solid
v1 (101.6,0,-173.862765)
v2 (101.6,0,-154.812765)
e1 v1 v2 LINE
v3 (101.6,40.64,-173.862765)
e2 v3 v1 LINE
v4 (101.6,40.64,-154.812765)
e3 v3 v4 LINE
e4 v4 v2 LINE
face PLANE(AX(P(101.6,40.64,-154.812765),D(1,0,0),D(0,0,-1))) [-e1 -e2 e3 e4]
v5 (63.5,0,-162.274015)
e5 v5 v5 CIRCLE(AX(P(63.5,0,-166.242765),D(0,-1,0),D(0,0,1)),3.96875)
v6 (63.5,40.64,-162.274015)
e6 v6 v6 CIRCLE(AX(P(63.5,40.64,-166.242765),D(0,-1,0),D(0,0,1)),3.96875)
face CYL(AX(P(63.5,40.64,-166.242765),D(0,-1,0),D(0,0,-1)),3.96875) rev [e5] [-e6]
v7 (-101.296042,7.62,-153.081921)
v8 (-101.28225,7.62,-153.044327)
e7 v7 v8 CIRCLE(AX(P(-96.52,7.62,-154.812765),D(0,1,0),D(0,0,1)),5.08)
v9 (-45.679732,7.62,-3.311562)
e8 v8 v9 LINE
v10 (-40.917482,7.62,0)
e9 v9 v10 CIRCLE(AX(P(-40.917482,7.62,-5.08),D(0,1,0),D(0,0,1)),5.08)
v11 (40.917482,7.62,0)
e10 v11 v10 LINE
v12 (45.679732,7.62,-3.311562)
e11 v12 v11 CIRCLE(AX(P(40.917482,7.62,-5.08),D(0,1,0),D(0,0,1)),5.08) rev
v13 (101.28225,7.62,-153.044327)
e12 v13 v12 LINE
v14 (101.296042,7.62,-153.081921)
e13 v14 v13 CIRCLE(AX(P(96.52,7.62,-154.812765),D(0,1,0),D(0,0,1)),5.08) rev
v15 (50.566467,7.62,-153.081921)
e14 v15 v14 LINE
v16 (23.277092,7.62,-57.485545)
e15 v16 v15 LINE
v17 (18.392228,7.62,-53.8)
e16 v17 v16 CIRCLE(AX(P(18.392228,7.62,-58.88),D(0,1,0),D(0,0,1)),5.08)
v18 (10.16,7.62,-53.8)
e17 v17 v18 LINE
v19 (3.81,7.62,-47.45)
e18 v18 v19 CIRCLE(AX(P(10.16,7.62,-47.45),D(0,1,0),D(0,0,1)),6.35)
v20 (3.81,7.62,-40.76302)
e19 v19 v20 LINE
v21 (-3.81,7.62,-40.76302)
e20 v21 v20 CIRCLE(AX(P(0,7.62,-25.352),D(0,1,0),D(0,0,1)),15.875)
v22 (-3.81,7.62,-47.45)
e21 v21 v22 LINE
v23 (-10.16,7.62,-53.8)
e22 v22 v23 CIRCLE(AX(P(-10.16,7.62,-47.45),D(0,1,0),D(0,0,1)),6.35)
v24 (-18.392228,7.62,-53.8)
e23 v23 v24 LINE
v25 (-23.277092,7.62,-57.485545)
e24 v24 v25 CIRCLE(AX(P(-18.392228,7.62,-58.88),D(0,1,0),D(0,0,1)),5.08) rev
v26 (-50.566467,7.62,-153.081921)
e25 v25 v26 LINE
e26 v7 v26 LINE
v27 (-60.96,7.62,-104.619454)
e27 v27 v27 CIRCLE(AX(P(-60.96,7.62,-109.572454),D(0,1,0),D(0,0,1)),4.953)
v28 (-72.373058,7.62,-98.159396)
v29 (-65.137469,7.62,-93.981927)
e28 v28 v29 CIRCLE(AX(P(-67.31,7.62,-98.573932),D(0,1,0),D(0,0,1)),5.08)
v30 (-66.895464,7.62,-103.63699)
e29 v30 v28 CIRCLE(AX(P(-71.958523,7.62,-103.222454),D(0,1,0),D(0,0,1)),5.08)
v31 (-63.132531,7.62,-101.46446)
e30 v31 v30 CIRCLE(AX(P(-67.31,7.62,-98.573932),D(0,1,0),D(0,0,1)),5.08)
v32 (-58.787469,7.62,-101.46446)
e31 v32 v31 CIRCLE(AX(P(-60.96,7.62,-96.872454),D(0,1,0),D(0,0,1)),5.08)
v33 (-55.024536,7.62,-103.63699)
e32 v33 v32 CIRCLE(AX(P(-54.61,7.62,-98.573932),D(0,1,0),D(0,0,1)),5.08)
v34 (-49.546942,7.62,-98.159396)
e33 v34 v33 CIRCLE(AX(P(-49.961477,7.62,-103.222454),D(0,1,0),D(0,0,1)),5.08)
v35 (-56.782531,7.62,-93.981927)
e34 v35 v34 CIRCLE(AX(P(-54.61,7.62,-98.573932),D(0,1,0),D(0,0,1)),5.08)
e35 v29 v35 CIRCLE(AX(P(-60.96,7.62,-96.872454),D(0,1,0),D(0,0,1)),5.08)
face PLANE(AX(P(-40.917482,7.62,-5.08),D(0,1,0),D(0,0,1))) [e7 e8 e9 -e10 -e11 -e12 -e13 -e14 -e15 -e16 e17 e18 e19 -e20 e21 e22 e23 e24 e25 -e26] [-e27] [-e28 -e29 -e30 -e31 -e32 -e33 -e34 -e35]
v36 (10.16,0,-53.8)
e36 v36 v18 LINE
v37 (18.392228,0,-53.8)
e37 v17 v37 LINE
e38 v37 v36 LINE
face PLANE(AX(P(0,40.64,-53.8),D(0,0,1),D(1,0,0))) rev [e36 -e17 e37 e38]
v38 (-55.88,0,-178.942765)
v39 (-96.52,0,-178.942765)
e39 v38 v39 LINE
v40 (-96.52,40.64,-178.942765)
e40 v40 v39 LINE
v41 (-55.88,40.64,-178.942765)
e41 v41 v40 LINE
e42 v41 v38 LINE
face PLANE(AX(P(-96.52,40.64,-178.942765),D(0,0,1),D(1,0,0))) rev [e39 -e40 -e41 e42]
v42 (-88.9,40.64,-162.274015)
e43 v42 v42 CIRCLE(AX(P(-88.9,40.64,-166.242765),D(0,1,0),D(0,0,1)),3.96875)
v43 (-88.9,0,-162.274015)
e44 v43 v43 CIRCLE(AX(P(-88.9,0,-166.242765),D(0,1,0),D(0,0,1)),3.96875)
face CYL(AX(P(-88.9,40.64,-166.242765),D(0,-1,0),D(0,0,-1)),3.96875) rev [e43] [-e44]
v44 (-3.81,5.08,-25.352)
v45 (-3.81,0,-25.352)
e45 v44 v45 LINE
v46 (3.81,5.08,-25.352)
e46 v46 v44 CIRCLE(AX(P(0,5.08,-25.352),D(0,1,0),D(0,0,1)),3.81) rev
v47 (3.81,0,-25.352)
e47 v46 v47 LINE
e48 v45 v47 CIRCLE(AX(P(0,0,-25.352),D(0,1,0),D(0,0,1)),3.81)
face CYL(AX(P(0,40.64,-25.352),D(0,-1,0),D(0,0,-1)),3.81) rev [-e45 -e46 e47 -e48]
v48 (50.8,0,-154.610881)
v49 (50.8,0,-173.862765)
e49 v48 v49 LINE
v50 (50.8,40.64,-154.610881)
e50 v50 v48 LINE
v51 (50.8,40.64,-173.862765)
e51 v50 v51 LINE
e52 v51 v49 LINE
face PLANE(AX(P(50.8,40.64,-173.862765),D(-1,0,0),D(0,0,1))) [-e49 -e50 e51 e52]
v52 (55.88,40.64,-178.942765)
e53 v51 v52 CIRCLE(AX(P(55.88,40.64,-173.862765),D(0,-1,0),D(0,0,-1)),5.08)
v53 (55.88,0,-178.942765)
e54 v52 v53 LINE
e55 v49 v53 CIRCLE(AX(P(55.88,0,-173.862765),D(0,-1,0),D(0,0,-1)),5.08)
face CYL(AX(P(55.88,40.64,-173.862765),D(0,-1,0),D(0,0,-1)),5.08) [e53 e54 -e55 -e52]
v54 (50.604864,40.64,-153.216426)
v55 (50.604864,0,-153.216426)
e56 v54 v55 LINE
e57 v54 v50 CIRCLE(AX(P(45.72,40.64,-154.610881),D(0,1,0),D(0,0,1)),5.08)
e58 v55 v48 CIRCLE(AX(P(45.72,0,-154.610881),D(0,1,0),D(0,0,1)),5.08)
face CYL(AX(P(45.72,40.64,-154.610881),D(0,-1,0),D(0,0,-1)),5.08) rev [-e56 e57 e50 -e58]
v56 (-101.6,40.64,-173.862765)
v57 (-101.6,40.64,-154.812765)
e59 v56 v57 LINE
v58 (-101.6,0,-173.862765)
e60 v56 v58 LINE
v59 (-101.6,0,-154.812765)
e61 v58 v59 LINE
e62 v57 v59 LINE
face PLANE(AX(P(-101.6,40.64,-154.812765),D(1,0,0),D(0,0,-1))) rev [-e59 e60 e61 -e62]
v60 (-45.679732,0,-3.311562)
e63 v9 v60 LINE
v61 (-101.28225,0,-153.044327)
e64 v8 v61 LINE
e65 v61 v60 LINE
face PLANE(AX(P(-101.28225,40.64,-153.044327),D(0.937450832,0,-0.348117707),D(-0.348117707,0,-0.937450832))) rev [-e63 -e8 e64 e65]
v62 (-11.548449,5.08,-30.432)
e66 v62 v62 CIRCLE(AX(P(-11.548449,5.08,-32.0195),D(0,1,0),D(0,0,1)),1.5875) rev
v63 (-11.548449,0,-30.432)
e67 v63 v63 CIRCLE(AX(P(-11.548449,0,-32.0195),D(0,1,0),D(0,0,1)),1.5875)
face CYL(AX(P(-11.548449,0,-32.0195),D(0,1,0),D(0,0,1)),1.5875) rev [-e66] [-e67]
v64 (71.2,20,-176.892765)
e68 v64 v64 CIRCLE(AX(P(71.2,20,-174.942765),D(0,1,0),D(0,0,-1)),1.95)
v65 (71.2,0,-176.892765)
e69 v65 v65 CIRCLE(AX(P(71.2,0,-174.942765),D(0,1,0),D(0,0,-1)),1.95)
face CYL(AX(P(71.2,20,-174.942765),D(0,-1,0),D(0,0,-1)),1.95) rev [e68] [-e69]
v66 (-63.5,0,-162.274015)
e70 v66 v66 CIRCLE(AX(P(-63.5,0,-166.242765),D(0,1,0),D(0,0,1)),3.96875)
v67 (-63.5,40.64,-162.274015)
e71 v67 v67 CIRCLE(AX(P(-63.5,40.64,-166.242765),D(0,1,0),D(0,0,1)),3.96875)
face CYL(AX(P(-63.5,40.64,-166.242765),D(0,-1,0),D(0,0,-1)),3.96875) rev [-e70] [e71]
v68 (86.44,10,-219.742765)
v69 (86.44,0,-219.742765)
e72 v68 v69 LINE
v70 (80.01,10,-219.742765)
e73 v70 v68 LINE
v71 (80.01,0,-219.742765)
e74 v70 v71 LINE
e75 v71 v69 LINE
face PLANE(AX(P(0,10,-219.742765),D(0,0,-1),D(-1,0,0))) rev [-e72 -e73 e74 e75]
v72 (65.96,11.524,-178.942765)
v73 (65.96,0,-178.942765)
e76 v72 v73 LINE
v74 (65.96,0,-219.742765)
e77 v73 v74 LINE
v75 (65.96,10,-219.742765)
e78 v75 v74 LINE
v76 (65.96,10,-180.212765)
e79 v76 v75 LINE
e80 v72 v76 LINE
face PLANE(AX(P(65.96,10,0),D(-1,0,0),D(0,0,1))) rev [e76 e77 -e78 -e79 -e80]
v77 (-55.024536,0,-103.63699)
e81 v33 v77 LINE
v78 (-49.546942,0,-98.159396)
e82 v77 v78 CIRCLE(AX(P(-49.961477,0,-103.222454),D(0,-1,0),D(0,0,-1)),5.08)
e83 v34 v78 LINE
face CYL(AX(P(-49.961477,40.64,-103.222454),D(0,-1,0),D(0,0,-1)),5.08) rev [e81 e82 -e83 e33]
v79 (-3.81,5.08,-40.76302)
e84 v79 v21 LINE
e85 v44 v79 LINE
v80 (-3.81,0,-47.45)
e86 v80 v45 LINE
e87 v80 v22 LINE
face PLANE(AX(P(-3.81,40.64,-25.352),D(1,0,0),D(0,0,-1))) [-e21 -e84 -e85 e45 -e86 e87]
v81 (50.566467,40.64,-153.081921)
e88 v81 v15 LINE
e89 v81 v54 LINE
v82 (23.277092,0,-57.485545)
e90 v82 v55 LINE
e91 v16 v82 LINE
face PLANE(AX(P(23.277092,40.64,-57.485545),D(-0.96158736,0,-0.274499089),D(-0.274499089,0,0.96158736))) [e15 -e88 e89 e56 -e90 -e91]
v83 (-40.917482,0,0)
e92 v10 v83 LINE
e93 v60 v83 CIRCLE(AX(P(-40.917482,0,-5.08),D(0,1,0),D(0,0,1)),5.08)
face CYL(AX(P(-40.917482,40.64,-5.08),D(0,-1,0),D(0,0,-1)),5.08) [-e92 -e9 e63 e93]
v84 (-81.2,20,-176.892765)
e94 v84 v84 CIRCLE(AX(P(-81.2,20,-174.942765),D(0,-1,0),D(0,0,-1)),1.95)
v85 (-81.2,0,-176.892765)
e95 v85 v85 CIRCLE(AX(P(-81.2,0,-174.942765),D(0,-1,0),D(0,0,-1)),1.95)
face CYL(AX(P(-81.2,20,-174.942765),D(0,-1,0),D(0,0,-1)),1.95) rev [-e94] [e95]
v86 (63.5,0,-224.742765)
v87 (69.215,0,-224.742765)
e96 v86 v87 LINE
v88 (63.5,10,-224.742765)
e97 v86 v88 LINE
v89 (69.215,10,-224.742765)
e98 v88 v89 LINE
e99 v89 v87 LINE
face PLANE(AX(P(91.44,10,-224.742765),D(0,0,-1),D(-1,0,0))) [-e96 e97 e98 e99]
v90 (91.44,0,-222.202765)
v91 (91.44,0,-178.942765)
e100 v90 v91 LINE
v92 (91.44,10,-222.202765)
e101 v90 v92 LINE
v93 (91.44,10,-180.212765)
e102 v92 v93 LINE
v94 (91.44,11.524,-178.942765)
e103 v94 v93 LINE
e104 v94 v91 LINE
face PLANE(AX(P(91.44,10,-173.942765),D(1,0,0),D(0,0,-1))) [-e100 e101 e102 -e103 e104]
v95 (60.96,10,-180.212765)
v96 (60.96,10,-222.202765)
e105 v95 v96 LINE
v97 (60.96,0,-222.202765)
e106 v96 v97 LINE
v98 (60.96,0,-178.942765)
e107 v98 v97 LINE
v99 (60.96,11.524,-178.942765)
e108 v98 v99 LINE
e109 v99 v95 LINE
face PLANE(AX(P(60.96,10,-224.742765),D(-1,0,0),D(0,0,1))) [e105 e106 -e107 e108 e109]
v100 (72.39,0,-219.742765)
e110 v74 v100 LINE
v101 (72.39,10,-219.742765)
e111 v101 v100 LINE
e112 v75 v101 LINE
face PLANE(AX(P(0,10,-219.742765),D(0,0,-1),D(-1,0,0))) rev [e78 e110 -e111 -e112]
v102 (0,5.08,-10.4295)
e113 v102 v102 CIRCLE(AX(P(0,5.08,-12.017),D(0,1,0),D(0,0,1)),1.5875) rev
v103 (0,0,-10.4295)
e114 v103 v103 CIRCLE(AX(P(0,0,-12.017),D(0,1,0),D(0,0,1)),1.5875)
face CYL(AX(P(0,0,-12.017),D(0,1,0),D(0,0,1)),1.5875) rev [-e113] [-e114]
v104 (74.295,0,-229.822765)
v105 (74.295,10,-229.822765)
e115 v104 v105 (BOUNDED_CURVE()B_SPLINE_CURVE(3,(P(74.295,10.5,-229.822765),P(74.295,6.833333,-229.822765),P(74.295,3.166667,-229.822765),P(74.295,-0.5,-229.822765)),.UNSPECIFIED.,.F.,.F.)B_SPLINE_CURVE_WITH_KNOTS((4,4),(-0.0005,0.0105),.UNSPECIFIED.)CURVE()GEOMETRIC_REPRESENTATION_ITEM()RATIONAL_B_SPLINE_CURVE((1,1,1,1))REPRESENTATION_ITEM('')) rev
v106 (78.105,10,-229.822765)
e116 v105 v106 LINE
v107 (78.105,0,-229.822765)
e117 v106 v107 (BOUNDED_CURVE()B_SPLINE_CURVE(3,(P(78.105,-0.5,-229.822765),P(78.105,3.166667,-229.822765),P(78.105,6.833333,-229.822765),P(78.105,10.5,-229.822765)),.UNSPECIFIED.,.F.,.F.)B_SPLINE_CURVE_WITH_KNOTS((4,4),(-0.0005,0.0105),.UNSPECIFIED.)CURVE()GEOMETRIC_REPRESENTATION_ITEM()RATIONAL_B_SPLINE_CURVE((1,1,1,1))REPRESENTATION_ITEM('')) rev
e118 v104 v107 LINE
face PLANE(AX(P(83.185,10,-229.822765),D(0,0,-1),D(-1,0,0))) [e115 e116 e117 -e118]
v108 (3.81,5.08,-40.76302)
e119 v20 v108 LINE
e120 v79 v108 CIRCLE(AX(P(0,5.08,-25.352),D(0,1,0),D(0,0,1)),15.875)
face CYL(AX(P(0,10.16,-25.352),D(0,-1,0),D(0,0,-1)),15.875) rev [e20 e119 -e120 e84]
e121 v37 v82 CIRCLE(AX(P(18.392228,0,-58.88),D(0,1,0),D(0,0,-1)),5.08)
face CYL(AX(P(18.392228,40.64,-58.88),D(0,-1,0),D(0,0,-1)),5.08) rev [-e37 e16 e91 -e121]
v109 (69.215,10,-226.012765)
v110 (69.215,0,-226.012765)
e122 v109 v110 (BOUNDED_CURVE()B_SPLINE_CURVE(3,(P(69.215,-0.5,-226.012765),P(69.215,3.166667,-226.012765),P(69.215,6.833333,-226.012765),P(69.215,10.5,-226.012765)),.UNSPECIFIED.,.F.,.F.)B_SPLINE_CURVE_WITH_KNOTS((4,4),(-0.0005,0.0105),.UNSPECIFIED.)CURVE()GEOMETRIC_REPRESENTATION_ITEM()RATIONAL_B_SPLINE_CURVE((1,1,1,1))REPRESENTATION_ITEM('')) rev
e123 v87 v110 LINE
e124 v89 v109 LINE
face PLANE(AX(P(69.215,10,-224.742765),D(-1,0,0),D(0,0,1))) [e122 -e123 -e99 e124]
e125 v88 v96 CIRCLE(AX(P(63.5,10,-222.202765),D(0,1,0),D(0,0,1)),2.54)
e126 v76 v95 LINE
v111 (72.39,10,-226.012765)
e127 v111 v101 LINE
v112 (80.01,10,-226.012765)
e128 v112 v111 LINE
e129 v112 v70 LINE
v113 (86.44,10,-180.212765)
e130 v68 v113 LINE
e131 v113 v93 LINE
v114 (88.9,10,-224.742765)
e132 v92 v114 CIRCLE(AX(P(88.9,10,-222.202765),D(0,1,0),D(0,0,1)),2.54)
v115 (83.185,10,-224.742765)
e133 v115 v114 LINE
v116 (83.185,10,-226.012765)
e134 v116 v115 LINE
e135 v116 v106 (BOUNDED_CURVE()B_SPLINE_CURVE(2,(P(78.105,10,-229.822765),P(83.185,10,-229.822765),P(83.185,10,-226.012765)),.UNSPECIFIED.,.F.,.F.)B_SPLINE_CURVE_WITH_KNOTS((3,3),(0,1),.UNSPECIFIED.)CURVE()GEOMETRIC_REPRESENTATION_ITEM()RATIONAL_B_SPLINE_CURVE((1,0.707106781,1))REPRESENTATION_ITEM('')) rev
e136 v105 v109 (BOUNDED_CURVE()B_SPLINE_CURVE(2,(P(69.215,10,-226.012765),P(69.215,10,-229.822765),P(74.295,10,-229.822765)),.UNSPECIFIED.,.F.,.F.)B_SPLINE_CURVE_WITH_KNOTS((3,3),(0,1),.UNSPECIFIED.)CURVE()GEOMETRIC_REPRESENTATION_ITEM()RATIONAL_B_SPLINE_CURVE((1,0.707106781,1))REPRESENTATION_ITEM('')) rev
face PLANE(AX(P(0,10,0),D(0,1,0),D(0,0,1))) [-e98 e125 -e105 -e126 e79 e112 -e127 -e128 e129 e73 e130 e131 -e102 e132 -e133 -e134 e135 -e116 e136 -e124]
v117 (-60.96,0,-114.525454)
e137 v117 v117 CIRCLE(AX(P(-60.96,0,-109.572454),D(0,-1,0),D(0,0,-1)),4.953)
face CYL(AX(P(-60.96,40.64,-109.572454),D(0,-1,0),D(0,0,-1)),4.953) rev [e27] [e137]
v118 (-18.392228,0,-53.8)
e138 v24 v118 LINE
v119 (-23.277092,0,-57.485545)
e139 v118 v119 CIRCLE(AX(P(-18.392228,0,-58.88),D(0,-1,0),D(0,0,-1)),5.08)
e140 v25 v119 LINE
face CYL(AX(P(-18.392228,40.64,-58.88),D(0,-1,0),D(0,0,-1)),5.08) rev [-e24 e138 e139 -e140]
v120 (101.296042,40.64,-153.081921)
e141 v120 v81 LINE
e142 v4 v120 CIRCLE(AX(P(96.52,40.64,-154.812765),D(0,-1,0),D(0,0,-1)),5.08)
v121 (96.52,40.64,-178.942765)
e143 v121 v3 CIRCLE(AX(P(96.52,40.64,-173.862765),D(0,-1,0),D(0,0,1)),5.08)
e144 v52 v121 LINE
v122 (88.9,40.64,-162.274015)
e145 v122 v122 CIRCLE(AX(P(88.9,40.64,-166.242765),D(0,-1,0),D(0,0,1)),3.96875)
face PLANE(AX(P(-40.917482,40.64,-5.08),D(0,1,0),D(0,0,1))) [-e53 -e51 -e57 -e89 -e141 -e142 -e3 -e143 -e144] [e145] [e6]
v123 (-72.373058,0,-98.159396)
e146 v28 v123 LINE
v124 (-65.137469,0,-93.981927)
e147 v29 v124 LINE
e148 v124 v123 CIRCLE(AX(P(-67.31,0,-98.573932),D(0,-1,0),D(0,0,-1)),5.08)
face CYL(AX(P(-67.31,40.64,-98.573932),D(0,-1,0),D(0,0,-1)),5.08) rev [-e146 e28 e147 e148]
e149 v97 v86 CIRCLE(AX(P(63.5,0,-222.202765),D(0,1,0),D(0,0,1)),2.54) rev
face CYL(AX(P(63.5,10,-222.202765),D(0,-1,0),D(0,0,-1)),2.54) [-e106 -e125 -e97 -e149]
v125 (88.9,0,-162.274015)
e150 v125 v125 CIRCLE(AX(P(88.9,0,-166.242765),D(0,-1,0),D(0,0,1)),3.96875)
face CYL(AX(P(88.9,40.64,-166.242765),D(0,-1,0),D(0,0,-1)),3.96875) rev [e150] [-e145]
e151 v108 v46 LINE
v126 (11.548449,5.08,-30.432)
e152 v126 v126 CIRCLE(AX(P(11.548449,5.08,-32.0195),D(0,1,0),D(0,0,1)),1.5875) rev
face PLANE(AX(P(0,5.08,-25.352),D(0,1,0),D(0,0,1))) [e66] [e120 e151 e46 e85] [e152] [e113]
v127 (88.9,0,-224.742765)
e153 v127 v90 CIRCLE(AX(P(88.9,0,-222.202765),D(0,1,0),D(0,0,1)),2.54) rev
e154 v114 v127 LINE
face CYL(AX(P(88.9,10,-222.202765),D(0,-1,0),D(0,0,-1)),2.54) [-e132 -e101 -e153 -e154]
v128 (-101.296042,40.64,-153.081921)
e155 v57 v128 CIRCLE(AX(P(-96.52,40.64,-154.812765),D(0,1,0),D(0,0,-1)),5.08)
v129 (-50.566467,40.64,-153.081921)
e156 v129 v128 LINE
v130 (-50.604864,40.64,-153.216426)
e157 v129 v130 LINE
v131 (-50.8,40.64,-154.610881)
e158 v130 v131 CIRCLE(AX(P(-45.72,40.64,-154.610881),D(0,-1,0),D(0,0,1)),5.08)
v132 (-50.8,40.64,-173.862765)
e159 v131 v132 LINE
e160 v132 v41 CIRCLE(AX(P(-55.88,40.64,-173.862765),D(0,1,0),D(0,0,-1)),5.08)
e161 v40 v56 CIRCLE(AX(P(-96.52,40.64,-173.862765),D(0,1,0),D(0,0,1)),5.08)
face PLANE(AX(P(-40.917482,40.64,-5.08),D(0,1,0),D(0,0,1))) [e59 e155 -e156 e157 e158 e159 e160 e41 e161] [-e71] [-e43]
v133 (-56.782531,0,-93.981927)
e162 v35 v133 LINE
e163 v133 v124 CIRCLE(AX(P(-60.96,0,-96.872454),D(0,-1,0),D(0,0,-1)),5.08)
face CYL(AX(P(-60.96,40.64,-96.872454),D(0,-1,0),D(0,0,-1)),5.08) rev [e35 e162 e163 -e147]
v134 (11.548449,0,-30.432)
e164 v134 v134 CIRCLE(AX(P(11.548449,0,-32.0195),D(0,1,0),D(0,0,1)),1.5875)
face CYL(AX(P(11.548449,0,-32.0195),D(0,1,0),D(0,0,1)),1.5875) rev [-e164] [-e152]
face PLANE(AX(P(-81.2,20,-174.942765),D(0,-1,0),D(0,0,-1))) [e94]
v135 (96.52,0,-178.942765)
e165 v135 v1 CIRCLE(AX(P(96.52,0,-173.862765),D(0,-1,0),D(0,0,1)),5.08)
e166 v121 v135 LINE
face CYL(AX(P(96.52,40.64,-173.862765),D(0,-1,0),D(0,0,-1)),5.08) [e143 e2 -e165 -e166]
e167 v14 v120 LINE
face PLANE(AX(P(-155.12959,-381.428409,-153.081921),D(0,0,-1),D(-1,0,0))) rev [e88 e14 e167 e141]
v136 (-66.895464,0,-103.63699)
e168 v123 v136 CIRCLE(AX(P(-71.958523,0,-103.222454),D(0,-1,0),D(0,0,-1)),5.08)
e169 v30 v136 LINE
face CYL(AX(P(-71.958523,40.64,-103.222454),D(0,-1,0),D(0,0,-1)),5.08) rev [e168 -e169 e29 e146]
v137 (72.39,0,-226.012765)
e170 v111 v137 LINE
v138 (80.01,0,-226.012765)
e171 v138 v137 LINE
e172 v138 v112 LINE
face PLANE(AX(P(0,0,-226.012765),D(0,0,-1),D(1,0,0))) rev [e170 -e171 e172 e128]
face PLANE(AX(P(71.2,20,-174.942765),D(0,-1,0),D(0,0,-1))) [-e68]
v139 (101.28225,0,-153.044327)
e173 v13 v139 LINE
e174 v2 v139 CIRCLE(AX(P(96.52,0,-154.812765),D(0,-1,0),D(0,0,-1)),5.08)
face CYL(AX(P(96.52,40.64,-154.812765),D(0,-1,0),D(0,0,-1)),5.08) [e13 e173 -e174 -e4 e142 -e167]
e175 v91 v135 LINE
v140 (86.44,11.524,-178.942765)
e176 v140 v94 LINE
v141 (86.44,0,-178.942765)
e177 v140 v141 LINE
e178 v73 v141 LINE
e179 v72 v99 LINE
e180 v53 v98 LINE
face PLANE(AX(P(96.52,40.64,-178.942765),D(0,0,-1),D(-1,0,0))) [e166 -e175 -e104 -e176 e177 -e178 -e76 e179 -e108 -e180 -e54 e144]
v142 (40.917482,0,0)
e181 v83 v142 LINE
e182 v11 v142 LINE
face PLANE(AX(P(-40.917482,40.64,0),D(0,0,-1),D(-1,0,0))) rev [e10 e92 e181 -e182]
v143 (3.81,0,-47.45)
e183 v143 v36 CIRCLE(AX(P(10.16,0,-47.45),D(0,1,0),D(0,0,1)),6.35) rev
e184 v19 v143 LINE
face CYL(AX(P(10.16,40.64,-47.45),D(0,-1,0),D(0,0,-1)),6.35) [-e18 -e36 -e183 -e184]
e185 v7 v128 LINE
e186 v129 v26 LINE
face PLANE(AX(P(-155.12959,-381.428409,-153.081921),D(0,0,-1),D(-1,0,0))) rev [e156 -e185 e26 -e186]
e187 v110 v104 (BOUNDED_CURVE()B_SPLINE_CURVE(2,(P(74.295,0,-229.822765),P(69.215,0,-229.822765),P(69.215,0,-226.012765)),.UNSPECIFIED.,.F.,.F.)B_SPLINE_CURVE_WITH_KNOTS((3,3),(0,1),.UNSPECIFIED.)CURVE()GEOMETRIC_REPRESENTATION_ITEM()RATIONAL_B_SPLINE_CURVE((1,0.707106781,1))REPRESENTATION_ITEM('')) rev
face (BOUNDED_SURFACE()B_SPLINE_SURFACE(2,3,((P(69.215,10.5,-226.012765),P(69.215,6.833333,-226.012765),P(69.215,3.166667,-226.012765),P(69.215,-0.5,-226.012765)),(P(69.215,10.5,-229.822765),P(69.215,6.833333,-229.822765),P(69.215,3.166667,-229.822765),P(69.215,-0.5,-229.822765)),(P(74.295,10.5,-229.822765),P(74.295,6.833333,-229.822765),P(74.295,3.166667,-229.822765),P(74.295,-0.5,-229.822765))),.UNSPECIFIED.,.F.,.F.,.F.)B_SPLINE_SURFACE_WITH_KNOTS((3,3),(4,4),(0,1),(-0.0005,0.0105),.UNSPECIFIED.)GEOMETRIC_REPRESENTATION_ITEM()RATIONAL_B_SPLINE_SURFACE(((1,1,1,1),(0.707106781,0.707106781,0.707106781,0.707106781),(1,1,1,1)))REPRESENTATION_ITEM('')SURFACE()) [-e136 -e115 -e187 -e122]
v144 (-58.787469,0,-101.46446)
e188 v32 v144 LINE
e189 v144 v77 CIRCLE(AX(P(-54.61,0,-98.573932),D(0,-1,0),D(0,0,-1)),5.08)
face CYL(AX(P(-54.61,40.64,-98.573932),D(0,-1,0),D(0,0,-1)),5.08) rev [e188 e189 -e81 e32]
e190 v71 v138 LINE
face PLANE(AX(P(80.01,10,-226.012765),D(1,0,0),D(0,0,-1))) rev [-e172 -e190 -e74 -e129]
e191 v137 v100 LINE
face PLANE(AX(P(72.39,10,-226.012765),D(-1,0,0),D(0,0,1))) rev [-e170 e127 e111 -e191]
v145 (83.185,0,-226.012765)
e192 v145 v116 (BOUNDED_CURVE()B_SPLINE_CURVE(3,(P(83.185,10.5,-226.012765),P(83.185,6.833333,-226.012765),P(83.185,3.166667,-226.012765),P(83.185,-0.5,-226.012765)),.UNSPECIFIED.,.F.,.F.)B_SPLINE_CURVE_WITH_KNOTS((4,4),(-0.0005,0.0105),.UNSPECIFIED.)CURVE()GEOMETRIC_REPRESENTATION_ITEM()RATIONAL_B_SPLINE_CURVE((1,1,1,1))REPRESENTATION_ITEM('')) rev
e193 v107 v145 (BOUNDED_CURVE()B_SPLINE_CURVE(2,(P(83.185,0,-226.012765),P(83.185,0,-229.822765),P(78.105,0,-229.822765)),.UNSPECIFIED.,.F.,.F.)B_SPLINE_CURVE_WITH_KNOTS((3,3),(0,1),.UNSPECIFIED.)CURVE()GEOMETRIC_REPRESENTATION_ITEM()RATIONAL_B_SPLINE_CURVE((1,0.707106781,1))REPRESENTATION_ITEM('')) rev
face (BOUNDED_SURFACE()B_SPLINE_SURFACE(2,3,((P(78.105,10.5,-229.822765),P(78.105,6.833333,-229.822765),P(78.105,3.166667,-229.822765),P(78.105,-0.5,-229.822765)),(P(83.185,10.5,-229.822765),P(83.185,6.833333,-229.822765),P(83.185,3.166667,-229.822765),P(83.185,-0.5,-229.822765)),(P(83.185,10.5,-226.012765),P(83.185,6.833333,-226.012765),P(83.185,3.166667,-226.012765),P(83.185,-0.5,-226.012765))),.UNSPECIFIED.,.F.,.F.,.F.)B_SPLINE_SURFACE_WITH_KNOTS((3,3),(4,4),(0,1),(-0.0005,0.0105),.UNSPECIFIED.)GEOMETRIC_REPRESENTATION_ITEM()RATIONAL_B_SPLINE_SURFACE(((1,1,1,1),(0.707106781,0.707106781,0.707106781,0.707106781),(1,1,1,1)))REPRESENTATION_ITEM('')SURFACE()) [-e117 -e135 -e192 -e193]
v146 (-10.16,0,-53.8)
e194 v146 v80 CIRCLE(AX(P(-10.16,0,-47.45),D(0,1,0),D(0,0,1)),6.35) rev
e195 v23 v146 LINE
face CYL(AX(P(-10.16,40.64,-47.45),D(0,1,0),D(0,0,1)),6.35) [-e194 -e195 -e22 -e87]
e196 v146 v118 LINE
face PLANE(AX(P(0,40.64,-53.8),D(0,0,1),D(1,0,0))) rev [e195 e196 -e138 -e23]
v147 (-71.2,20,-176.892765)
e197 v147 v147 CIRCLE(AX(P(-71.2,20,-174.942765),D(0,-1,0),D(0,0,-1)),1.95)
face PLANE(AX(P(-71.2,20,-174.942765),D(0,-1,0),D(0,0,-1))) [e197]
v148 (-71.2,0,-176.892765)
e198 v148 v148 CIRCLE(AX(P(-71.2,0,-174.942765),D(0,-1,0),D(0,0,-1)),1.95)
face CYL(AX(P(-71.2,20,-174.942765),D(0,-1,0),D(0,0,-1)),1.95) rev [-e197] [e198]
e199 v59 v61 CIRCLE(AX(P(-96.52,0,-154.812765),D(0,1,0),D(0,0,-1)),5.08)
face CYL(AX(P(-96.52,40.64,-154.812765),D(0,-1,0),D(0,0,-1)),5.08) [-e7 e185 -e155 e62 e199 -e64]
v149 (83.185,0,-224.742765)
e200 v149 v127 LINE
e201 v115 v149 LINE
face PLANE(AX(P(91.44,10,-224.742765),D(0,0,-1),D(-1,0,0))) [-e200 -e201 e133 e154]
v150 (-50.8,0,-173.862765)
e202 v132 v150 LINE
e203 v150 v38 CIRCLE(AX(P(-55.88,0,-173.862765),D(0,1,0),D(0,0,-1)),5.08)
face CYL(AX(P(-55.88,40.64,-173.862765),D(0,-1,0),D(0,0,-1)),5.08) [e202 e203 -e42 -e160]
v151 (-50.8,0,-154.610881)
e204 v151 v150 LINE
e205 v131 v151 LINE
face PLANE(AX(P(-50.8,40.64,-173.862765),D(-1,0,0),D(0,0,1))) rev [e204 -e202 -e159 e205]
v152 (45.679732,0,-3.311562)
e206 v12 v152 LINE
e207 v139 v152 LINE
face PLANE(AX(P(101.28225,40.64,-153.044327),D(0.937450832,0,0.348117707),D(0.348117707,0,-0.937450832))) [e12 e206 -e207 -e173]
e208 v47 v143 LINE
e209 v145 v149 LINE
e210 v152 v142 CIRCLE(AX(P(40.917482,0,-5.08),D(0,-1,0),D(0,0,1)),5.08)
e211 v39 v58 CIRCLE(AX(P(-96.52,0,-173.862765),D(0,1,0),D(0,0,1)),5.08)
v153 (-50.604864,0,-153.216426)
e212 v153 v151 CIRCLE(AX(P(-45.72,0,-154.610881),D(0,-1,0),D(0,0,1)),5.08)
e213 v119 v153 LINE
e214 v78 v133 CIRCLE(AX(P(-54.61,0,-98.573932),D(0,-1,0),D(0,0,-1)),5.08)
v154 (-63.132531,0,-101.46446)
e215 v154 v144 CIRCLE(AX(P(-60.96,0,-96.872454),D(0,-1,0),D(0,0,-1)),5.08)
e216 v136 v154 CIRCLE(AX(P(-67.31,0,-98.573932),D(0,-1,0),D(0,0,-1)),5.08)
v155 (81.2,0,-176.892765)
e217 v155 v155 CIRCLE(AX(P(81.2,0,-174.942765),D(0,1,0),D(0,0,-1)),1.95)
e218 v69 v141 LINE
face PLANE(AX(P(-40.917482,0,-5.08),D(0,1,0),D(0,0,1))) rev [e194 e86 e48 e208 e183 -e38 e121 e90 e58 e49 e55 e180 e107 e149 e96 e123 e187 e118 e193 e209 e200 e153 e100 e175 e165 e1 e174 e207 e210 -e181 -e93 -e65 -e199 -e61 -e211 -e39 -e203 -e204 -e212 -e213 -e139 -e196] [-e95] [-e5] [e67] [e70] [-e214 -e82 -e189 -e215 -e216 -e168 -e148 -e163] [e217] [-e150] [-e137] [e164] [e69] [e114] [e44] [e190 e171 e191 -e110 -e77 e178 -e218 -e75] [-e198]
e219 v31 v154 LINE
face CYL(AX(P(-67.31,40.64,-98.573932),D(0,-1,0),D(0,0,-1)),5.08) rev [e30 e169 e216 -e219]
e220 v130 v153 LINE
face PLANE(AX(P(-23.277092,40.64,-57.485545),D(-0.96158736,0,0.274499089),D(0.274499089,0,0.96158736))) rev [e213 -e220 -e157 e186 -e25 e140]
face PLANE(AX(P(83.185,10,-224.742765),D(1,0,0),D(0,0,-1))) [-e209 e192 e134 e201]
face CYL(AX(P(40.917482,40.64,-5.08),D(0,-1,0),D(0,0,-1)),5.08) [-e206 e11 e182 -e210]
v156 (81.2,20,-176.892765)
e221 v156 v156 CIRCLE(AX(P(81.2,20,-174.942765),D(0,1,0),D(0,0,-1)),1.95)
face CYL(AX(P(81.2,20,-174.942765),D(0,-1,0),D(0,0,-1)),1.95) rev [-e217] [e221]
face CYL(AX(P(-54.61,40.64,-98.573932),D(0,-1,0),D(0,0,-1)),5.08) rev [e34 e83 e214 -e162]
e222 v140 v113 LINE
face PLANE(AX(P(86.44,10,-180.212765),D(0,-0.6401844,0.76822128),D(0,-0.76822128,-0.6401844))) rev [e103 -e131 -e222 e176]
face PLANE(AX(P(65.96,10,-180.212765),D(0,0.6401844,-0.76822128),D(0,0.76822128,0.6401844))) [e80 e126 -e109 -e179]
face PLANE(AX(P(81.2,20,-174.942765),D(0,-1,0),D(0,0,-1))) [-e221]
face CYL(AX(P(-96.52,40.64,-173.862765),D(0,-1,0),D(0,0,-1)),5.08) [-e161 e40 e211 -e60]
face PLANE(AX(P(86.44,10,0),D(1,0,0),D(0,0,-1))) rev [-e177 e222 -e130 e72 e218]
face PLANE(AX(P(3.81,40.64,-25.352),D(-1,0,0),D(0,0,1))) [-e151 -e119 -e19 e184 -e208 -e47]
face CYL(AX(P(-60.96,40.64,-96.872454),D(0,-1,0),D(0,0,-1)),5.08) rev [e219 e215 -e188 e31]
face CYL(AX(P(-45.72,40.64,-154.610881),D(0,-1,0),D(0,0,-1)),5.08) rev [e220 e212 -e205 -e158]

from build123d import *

# Parameters (mm, degrees)
SKETCH1_R            = 3.96875
BOSS_EXTRUDE2_DEPTH  = 40.64
SKETCH4_R            = 1.5875
CUT_EXTRUDE1_DEPTH   = 210.749095026
CUT_EXTRUDE2_START   = 5.08
SKETCH5_R            = 15.875
CUT_EXTRUDE2_DEPTH   = 5.08
SKETCH7_W            = 321.437634852
SKETCH7_H            = 153.081921076
CUT_EXTRUDE3_DEPTH   = 33.02
CUT_EXTRUDE5_DEPTH   = 210.749095026
FILLET1_R            = 6.35
FILLET2_R            = 6.35
EXTRUDE_THIN1_DEPTH  = 10
SKETCH14_R           = 1.950000064
CUT_EXTRUDE6_DEPTH   = 20
BOSS_EXTRUDE4_DEPTH  = 5
MIRROR5_COPY_1_DEPTH = 5
FILLET3_R            = 2.54
SKETCH20_W           = 13.97
SKETCH20_H           = 5.08
BOSS_EXTRUDE5_DEPTH  = 10
FILLET7_SIZE         = 3.81
FILLET7_SIZE_2       = 5.08
FILLET6_SIZE         = 3.81
FILLET6_SIZE_2       = 5.08
CUT_EXTRUDE10_START  = -5
SKETCH19_W           = 7.62
SKETCH19_H           = 10.16
CUT_EXTRUDE10_DEPTH  = 6.27
MIRROR6_OUTLINE_W    = 7.62
MIRROR6_OUTLINE_H    = 5
MIRROR6_DEPTH        = 10
MIRROR6_2_DEPTH      = 10
SKETCH21_W           = 77.087164644
SKETCH21_H           = 69.073945867
CUT_EXTRUDE11_DEPTH  = 210.74909516
SKETCH23_R           = 5.08
CUT_EXTRUDE12_DEPTH  = 255.54404949
SKETCH22_R           = 4.953
CUT_EXTRUDE13_DEPTH  = 255.54404949


# Read off the part's stored shape, not the designer's step: Mirror6
with BuildPart() as part:
    # Sketch1 → Boss-Extrude2 (new body)
    with BuildSketch(Plane(origin=(0, 0, 0), x_dir=(1, 0, 0), z_dir=(0, 1, 0))):
        with BuildLine():
            Line((-96.52, 178.942765331), (-55.88, 178.942765331))
            ThreePointArc((-55.88, 178.942765331), (-52.287897552, 177.454867779), (-50.8, 173.862765331))
            Line((-50.8, 173.862765331), (-50.8, 154.610881096))
            ThreePointArc((-50.8, 154.610881096), (-50.750979429, 153.906859803), (-50.604863787, 153.216425724))
            Line((-50.604863787, 153.216425724), (-23.277092285, 57.485544628))
            ThreePointArc((-23.277092285, 57.485544628), (-21.451849938, 54.824742099), (-18.392228498, 53.8))
            Line((-18.392228498, 53.8), (0, 53.8))
            Line((0, 53.8), (0, 0))
            Line((0, 0), (-40.91748188, 0))
            ThreePointArc((-40.91748188, 0), (-43.817717665, 0.909264766), (-45.679732106, 3.31156205))
            Line((-45.679732106, 3.31156205), (-101.282250226, 153.044327381))
            ThreePointArc((-101.282250226, 153.044327381), (-101.519931557, 153.914386555), (-101.6, 154.812765331))
            Line((-101.6, 154.812765331), (-101.6, 173.862765331))
            ThreePointArc((-101.6, 173.862765331), (-100.112102448, 177.454867779), (-96.52, 178.942765331))
        make_face()
        with Locations(Location((-88.9, 166.242765331, 0), (0, 0, 270))):
            Circle(SKETCH1_R, mode=Mode.SUBTRACT)
        with Locations(Location((-63.5, 166.242765331, 0), (0, 0, 270))):
            Circle(SKETCH1_R, mode=Mode.SUBTRACT)
    boss_extrude2 = extrude(amount=BOSS_EXTRUDE2_DEPTH)

    # Mirror1: Boss-Extrude2 across plane
    add(boss_extrude2.mirror(Plane(origin=(0, 40.64, -53.8), x_dir=(0, 0, 1), z_dir=(-1, 0, 0))))

    # Sketch4 → Cut-Extrude1 (cut, through all)
    with BuildSketch(Plane(origin=(0, 40.64, 0), x_dir=(1, 0, 0), z_dir=(0, 1, 0))):
        with Locations(Location((11.548448759, 32.0195, 0), (0, 0, 270))):
            Circle(SKETCH4_R)
        with Locations(Location((0, 12.017, 0), (0, 0, 270))):
            Circle(SKETCH4_R)
        with Locations(Location((-11.548448759, 32.0195, 0), (0, 0, 270))):
            Circle(SKETCH4_R)
    extrude(amount=-CUT_EXTRUDE1_DEPTH, mode=Mode.SUBTRACT)

    # Sketch5 → Cut-Extrude2 (cut)
    with BuildSketch(Plane(origin=(0, 0, 0), x_dir=(1, 0, 0), z_dir=(0, 1, 0)).offset(CUT_EXTRUDE2_START)):
        with Locations(Location((0, 25.352, 0), (0, 0, 270))):
            Circle(SKETCH5_R)
    extrude(amount=CUT_EXTRUDE2_DEPTH, mode=Mode.SUBTRACT)

    # Sketch7 → Cut-Extrude3 (cut)
    with BuildSketch(Plane(origin=(0, 40.64, 0), x_dir=(1, 0, 0), z_dir=(0, 1, 0))):
        with Locations((5.589227859, 76.540960538)):
            Rectangle(SKETCH7_W, SKETCH7_H)
    extrude(amount=-CUT_EXTRUDE3_DEPTH, mode=Mode.SUBTRACT)

    # Sketch8 → Cut-Extrude5 (cut, through all)
    with BuildSketch(Plane(origin=(0, 0, 0), x_dir=(1, 0, 0), z_dir=(0, 1, 0))):
        with BuildLine():
            Line((-3.81, 25.352), (-3.81, 53.8))
            ThreePointArc((-3.81, 53.8), (0, 57.61), (3.81, 53.8))
            Line((3.81, 53.8), (3.81, 25.352))
            ThreePointArc((3.81, 25.352), (0, 21.542), (-3.81, 25.352))
        make_face()
    extrude(amount=CUT_EXTRUDE5_DEPTH, mode=Mode.SUBTRACT)

    # Fillet1
    fillet1_edges = [part.edges().sort_by_distance(p)[0] for p in [
        (-3.81, 3.81, -53.8),
    ]]
    fillet(fillet1_edges, radius=FILLET1_R)

    # Fillet2
    fillet2_edges = [part.edges().sort_by_distance(p)[0] for p in [
        (3.81, 3.81, -53.8),
    ]]
    fillet(fillet2_edges, radius=FILLET2_R)

    # Sketch9 → Extrude-Thin1 (add)
    with BuildSketch(Plane(origin=(0, 0, 0), x_dir=(1, 0, 0), z_dir=(0, 1, 0))):
        Polygon((-91.44, 173.942765331), (-91.44, 224.742765331), (-60.96, 224.742765331), (-60.96, 173.942765331), (-65.96, 173.942765331), (-65.96, 219.742765331), (-86.44, 219.742765331), (-86.44, 173.942765331), align=None)
    extrude_thin1 = extrude(amount=EXTRUDE_THIN1_DEPTH)

    # Sketch14 → Cut-Extrude6 (cut)
    with BuildSketch(Plane.XZ):
        with Locations(Location((-81.2, -174.942765331, 0), (0, 0, 270))):
            Circle(SKETCH14_R)
        with Locations(Location((-71.2, -174.942765331, 0), (0, 0, 270))):
            Circle(SKETCH14_R)
    cut_extrude6 = extrude(amount=-CUT_EXTRUDE6_DEPTH, mode=Mode.SUBTRACT)

    # Sketch18 → Boss-Extrude4 (add)
    with BuildSketch(Plane(origin=(-60.96, 10, -178.942765331), x_dir=(0, 0, 1), z_dir=(-1, 0, 0))):
        Polygon((-1.27, 0), (0, 1.524), (0, 0), align=None)
    boss_extrude4 = extrude(amount=BOSS_EXTRUDE4_DEPTH)

    # Mirror3: Boss-Extrude4 across plane
    add(boss_extrude4.mirror(Plane(origin=(-76.2, 0, 0), x_dir=(0, 0, 1), z_dir=(1, 0, 0))))

    # Mirror5: Extrude-Thin1, Cut-Extrude6, Boss-Extrude4 across plane
    add(extrude_thin1.mirror(Plane(origin=(0, 0, 0), x_dir=(0, 0, 1), z_dir=(1, 0, 0))))
    add(cut_extrude6.mirror(Plane(origin=(0, 0, 0), x_dir=(0, 0, 1), z_dir=(1, 0, 0))), mode=Mode.SUBTRACT)
    add(boss_extrude4.mirror(Plane(origin=(0, 0, 0), x_dir=(0, 0, 1), z_dir=(1, 0, 0))))

    # Mirror5 copy 1 sketch → Mirror5 copy 1 (add)
    with BuildSketch(Plane(origin=(91.44, 10, -178.942765331), x_dir=(0, 0, 1), z_dir=(-1, 0, 0))):
        Polygon((-1.27, 0), (0, 1.524), (0, 0), align=None)
    extrude(amount=MIRROR5_COPY_1_DEPTH)

    # Fillet3
    fillet3_edges = [part.edges().sort_by_distance(p)[0] for p in [
        (-91.44, 5, -224.742765331),
        (-60.96, 5, -224.742765331),
        (91.44, 5, -224.742765331),
        (60.96, 5, -224.742765331),
    ]]
    fillet(fillet3_edges, radius=FILLET3_R)

    # Sketch20 → Boss-Extrude5 (add)
    with BuildSketch(Plane(origin=(0, 0, 0), x_dir=(1, 0, 0), z_dir=(0, 1, 0))):
        with Locations((-76.2, 227.282765331)):
            Rectangle(SKETCH20_W, SKETCH20_H)
    extrude(amount=BOSS_EXTRUDE5_DEPTH)

    # Fillet7
    # an asymmetric fillet: 5.08, 3.81 mm, written as the material it takes off along each edge
    with BuildSketch(Plane(origin=(-83.185, -12.7, -229.822765331), x_dir=(0, 0, 1), z_dir=(0, 1, 0))) as fillet7_piece_1:
        with BuildLine():
            Bezier((FILLET7_SIZE, 0), (0, 0), (0, FILLET7_SIZE_2), weights=[1, 0.707106781, 1])
            Line((0, FILLET7_SIZE_2), (0, 0))
            Line((0, 0), (FILLET7_SIZE, 0))
        make_face()
    extrude(amount=35.4, mode=Mode.SUBTRACT)

    # Fillet6
    # an asymmetric fillet: 5.08, 3.81 mm, written as the material it takes off along each edge
    with BuildSketch(Plane(origin=(-69.215, -12.7, -229.822765331), x_dir=(0, 0, 1), z_dir=(0, 1, 0))) as fillet6_piece_1:
        with BuildLine():
            Bezier((FILLET6_SIZE, 0), (0, 0), (0, -FILLET6_SIZE_2), weights=[1, 0.707106781, 1])
            Line((0, -FILLET6_SIZE_2), (0, 0))
            Line((0, 0), (FILLET6_SIZE, 0))
        make_face()
    extrude(amount=35.4, mode=Mode.SUBTRACT)

    # Sketch19 → Cut-Extrude10 (cut)
    with BuildSketch(Plane(origin=(0, 0, -224.742765331), x_dir=(-1, 0, 0), z_dir=(0, 0, -1)).offset(CUT_EXTRUDE10_START)):
        with Locations((76.2, 4.92)):
            Rectangle(SKETCH19_W, SKETCH19_H)
    extrude(amount=CUT_EXTRUDE10_DEPTH, mode=Mode.SUBTRACT)

    # Mirror6 outline → Mirror6 (cut)
    with BuildSketch(Plane(origin=(0, 0, 0), x_dir=(1, 0, 0), z_dir=(0, 1, 0))):
        with Locations((76.2, 222.242765331)):
            Rectangle(MIRROR6_OUTLINE_W, MIRROR6_OUTLINE_H)
    extrude(amount=MIRROR6_DEPTH, mode=Mode.SUBTRACT)

    # Mirror6 2 outline → Mirror6 2 (add)
    with BuildSketch(Plane(origin=(0, 0, 0), x_dir=(1, 0, 0), z_dir=(0, 1, 0))):
        with BuildLine():
            add(Edge.make_bspline(
                [(78.105, 229.822765331), (83.185, 229.822765331), (83.185, 226.012765331)],
                knots=[0, 0, 0, 1, 1, 1], degree=2, weights=[1, 0.707106781, 1]))
            Line((78.105, 229.822765331), (74.295, 229.822765331))
            add(Edge.make_bspline(
                [(69.215, 226.012765331), (69.215, 229.822765331), (74.295, 229.822765331)],
                knots=[0, 0, 0, 1, 1, 1], degree=2, weights=[1, 0.707106781, 1]))
            Line((69.215, 226.012765331), (69.215, 224.742765331))
            Line((69.215, 224.742765331), (72.39, 224.742765331))
            Line((72.39, 224.742765331), (72.39, 226.012765331))
            Line((72.39, 226.012765331), (80.01, 226.012765331))
            Line((80.01, 226.012765331), (80.01, 224.742765331))
            Line((80.01, 224.742765331), (83.185, 224.742765331))
            Line((83.185, 224.742765331), (83.185, 226.012765331))
        make_face()
    extrude(amount=MIRROR6_2_DEPTH)

    # Sketch21 → Cut-Extrude11 (cut, through all)
    with BuildSketch(Plane(origin=(0, 0, -178.942765331), x_dir=(-1, 0, 0), z_dir=(0, 0, -1))):
        with Locations((78.752430528, 22.788762469)):
            Rectangle(SKETCH21_W, SKETCH21_H)
    extrude(amount=CUT_EXTRUDE11_DEPTH, mode=Mode.SUBTRACT)

    # Sketch23 → Cut-Extrude12 (cut, through all)
    with BuildSketch(Plane.XZ):
        with Locations((-67.31, -98.573931837)):
            Circle(SKETCH23_R)
        with Locations((-71.958522628, -103.222454465)):
            Circle(SKETCH23_R)
        with Locations((-60.96, -96.872454465)):
            Circle(SKETCH23_R)
        with Locations((-54.61, -98.573931837)):
            Circle(SKETCH23_R)
        with Locations((-49.961477372, -103.222454465)):
            Circle(SKETCH23_R)
    extrude(amount=-CUT_EXTRUDE12_DEPTH, mode=Mode.SUBTRACT)

    # Sketch22 → Cut-Extrude13 (cut, through all)
    with BuildSketch(Plane.XZ):
        with Locations(Location((-60.96, -109.572454465, 0), (0, 0, 270))):
            Circle(SKETCH22_R)
    extrude(amount=-CUT_EXTRUDE13_DEPTH, mode=Mode.SUBTRACT)


solid = part.part
